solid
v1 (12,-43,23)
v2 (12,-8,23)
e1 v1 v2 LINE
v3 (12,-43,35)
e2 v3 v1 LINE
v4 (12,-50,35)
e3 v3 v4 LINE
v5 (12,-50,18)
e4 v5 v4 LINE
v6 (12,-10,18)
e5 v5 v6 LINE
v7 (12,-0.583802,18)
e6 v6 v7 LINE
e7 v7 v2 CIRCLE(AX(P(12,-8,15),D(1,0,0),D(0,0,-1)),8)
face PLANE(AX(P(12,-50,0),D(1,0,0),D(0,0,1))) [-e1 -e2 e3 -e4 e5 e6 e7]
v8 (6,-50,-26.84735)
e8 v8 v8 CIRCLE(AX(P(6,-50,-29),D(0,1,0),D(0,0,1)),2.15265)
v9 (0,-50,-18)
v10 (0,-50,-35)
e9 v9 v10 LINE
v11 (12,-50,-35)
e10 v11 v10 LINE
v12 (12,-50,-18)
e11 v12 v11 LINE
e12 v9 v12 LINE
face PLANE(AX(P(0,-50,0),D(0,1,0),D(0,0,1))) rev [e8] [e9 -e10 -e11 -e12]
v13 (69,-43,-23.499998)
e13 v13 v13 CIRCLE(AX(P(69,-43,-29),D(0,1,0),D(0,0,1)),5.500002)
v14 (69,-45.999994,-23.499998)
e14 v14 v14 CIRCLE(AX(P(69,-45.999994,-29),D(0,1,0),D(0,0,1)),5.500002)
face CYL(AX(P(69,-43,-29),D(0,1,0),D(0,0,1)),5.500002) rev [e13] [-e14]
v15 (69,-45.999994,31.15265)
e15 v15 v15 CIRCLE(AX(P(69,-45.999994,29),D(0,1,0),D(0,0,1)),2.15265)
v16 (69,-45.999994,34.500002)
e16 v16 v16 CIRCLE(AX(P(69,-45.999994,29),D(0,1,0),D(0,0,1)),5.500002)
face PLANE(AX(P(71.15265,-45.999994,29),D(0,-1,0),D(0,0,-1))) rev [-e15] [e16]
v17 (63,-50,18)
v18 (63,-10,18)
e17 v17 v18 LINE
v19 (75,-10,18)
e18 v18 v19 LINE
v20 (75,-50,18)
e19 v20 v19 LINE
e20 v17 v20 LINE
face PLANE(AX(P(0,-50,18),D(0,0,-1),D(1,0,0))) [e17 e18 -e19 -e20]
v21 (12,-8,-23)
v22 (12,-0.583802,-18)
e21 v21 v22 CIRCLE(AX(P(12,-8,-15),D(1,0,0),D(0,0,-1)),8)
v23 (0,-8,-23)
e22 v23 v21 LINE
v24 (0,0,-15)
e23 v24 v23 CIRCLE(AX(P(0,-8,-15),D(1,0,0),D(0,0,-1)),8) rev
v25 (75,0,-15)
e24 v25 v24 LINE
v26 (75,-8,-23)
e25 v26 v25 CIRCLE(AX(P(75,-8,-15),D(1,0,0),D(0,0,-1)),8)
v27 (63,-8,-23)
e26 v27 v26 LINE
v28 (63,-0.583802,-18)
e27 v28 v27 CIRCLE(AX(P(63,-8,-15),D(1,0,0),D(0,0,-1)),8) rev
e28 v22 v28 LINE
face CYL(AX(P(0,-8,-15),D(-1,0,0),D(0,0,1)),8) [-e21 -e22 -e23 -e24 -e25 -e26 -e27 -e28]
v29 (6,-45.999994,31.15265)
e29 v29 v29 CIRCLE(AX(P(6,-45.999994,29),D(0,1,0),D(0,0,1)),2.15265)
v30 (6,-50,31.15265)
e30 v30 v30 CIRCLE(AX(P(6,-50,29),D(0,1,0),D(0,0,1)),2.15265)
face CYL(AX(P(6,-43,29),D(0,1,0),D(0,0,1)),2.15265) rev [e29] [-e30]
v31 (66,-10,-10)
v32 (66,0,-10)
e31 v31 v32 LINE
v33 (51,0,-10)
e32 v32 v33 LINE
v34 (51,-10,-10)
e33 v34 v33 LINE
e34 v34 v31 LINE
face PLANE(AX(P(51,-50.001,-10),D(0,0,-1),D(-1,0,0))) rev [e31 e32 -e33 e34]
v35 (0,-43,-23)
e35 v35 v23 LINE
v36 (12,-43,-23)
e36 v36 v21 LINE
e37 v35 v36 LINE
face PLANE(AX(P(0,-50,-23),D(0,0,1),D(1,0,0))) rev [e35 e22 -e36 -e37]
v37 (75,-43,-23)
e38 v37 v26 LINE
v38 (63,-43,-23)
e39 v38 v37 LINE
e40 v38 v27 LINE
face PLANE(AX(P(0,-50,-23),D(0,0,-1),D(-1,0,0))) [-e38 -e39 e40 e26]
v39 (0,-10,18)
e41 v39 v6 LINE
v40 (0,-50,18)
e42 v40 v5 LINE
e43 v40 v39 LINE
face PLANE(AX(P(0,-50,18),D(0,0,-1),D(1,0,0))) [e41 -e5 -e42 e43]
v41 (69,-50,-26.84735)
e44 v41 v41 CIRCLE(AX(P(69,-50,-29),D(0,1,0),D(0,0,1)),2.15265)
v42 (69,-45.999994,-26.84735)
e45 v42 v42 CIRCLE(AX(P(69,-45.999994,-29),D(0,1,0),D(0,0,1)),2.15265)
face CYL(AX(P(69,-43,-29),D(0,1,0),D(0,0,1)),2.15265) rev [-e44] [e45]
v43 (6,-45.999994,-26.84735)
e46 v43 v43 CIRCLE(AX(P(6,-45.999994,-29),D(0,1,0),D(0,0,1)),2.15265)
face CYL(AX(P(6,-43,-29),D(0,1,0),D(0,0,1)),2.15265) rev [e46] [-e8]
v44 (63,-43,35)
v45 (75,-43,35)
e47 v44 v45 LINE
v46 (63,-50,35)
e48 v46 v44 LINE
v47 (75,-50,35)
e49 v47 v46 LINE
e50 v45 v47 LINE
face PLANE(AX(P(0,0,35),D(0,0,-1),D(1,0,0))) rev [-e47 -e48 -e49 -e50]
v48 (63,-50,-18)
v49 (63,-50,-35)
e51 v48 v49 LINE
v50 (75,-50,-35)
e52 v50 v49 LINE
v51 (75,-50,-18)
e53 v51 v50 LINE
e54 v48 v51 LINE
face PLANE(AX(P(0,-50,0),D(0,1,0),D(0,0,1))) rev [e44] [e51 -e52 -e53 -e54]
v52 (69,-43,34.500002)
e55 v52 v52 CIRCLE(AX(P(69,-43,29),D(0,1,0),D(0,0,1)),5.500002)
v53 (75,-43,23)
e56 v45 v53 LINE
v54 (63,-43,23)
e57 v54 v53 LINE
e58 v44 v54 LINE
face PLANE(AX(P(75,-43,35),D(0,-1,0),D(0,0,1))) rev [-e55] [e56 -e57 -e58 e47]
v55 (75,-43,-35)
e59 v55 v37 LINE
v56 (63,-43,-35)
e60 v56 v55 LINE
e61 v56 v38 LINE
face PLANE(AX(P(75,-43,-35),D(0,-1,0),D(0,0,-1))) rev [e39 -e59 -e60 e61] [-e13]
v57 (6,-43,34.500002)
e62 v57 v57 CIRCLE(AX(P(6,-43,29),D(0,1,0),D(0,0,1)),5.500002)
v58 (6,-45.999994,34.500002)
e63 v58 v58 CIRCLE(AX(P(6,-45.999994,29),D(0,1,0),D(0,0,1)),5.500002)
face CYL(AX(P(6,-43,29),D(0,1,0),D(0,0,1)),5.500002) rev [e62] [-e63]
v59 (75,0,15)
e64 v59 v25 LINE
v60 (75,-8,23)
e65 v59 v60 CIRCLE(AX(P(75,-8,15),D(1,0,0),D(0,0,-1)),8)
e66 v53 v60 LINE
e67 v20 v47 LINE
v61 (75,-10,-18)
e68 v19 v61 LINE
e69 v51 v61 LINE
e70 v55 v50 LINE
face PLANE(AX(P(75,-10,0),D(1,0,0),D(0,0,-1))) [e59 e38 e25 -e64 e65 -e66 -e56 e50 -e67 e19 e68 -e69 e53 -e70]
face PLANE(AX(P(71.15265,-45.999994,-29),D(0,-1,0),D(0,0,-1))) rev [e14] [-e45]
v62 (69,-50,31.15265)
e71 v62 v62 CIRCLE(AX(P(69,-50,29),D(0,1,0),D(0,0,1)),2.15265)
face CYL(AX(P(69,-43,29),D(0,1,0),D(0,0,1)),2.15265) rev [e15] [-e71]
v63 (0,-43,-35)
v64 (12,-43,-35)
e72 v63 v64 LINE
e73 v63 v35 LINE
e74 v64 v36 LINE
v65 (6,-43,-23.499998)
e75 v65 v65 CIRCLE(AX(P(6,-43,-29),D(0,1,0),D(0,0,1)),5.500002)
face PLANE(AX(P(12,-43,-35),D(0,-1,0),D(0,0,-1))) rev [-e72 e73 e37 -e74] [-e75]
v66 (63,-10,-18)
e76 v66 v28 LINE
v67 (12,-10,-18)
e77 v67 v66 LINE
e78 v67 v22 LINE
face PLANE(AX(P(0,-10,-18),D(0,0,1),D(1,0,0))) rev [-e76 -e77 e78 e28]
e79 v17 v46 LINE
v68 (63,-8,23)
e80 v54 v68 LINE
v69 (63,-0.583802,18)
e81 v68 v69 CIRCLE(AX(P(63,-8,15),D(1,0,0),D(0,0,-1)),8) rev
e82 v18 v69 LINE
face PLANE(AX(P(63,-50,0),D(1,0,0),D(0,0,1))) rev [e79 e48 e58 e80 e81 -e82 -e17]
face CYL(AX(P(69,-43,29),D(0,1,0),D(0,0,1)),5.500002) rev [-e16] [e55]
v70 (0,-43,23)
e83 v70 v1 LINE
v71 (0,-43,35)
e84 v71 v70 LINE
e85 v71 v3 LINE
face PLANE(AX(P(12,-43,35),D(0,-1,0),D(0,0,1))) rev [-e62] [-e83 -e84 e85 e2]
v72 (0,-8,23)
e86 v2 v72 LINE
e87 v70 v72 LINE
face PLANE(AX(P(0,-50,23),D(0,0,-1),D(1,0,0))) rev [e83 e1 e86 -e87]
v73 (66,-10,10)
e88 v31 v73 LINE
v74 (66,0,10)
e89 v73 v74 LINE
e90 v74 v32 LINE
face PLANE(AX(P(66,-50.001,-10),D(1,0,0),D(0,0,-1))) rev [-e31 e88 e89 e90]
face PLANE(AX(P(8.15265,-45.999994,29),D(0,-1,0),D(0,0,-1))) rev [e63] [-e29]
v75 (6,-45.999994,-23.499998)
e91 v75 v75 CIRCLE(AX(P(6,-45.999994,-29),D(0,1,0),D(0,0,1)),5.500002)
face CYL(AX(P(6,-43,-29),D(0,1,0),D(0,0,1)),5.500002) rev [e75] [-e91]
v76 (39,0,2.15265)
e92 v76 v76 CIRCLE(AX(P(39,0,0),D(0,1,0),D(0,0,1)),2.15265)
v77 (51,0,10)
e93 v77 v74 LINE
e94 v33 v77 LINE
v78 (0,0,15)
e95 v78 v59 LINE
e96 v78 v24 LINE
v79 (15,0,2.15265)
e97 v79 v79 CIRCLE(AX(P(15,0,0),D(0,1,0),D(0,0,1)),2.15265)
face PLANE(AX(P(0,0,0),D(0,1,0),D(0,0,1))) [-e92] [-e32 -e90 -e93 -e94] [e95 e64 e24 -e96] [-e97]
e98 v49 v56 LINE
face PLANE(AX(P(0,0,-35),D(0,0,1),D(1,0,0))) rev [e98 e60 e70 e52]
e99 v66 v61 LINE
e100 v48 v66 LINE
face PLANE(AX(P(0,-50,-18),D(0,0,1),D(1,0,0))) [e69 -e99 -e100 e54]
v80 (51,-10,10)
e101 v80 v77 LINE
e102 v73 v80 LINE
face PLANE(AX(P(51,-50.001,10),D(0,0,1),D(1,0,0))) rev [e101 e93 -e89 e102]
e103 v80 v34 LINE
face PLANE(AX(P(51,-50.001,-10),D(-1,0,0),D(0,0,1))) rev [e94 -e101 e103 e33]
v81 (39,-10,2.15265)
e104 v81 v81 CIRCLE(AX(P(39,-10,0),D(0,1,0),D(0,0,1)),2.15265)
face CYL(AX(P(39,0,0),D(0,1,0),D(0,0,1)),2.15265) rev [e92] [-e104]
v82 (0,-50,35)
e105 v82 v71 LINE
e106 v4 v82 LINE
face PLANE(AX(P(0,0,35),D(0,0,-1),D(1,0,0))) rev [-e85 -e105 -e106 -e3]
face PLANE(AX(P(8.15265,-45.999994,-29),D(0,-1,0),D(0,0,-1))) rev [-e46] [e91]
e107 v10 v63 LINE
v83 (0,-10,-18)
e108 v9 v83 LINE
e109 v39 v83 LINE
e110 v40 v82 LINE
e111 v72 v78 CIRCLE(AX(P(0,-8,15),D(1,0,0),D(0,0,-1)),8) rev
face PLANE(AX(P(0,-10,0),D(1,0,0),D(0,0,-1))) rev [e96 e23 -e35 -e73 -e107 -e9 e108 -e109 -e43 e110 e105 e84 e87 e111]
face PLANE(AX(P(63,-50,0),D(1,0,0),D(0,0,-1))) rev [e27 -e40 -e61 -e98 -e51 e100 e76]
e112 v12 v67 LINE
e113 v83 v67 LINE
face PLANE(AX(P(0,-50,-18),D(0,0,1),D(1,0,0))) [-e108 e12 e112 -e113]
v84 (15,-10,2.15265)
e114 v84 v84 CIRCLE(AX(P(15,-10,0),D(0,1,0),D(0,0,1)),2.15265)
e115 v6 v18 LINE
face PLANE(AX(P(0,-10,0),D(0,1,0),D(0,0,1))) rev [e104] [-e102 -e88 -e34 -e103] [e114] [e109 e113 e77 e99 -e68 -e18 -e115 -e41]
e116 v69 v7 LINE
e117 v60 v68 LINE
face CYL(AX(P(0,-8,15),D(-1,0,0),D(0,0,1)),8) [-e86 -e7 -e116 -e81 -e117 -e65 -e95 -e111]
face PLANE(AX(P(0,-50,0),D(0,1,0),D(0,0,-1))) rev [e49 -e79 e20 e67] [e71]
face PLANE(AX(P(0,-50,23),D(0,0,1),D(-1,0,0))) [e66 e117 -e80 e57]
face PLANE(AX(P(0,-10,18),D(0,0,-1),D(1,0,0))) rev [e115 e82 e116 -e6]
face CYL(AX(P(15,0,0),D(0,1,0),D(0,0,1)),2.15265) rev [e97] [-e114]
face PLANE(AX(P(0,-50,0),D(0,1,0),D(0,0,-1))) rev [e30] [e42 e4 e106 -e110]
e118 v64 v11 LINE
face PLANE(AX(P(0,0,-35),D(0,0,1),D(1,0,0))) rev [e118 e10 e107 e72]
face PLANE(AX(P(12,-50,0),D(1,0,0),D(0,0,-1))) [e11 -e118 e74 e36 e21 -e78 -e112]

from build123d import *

# Parameters (mm, degrees)
STRUCTURE_W                                     = 75
STRUCTURE_H                                     = 18
BOSS_CORPS_DEPTH                                = 10
BOSS_PATES_OUTLINE_W                            = 50
BOSS_PATES_OUTLINE_H                            = 5
BOSS_PATES_DEPTH                                = 12
BOSS_PATES_START                                = 63
BOSS_PATES_2_OUTLINE_W                          = 50
BOSS_PATES_2_OUTLINE_H                          = 5
BOSS_PATES_2_DEPTH                              = 12
SKETCH2_W                                       = 12
SKETCH2_H                                       = 7
BOSS_ATTACHES_DEPTH                             = 12
F_6_CLEARANCE_HOLE1_D                           = 4.3053
CBORE_FOR_6_PAN_HEAD_MACHINE_SCREW1_D           = 4.3053
CBORE_FOR_6_PAN_HEAD_MACHINE_SCREW1_CBORE_D     = 11.0000034
CBORE_FOR_6_PAN_HEAD_MACHINE_SCREW1_CBORE_DEPTH = 2.999994
FILLET1_R                                       = 8
CUT_EXTRUDE1_REACH                              = 98.695
SKETCH10_W                                      = 15
SKETCH10_H                                      = 20


# Read off the part's stored shape, not the designer's step: Boss-Pates
with BuildPart() as part:
    # Structure → Boss-Corps (new body)
    with BuildSketch(Plane(origin=(0, 0, 0), x_dir=(1, 0, 0), z_dir=(0, 1, 0))):
        with Locations((37.5, 9)):
            Rectangle(STRUCTURE_W, STRUCTURE_H)
    extrude(amount=-BOSS_CORPS_DEPTH)

    # Boss-Pates outline → Boss-Pates (add)
    with BuildSketch(Plane.YZ):
        with Locations((-25, -20.5)):
            Rectangle(BOSS_PATES_OUTLINE_W, BOSS_PATES_OUTLINE_H)
    extrude(amount=BOSS_PATES_DEPTH)

    # Boss-Pates 2 outline → Boss-Pates 2 (add)
    with BuildSketch(Plane.YZ.offset(BOSS_PATES_START)):
        with Locations((-25, -20.5)):
            Rectangle(BOSS_PATES_2_OUTLINE_W, BOSS_PATES_2_OUTLINE_H)
    extrude(amount=BOSS_PATES_2_DEPTH)

    # Sketch2 → Boss-Attaches (add)
    with BuildSketch(Plane(origin=(0, 0, -23), x_dir=(-1, 0, 0), z_dir=(0, 0, -1))):
        with Locations((-69, -46.5)):
            Rectangle(SKETCH2_W, SKETCH2_H)
        with Locations((-6, -46.5)):
            Rectangle(SKETCH2_W, SKETCH2_H)
    extrude(amount=BOSS_ATTACHES_DEPTH)

    # Mirror4: part across plane


with BuildPart() as part_1:
    add(part.part)
    add(part.part.mirror(Plane(origin=(0, -10, 0), x_dir=(1, 0, 0), z_dir=(0, 0, 1))))

    # #6 Clearance Hole1 (through all)
    with Locations(Plane(origin=(0, 0, 0), x_dir=(1, 0, 0), z_dir=(0, 1, 0))):
        with Locations((15, 0), (39, 0)):
            Hole(F_6_CLEARANCE_HOLE1_D / 2)

    # CBORE for #6 Pan Head Machine Screw1 (through all)
    with Locations(Plane(origin=(0, -43, 0), x_dir=(1, 0, 0), z_dir=(0, 1, 0))):
        with Locations((6, 29), (69, 29), (69, -29), (6, -29)):
            CounterBoreHole(CBORE_FOR_6_PAN_HEAD_MACHINE_SCREW1_D / 2, CBORE_FOR_6_PAN_HEAD_MACHINE_SCREW1_CBORE_D / 2, CBORE_FOR_6_PAN_HEAD_MACHINE_SCREW1_CBORE_DEPTH)

    # Fillet1
    fillet1_edges = [part_1.edges().sort_by_distance(p)[0] for p in [
        (69, 0, -23),
        (6, 0, 23),
    ]]
    fillet(fillet1_edges, radius=FILLET1_R)

    # Sketch10 → Cut-Extrude1 (cut, up to next)
    with BuildSketch(Plane(origin=(0, 0, 0), x_dir=(1, 0, 0), z_dir=(0, 1, 0)), mode=Mode.PRIVATE) as cut_extrude1_sk1:
        with Locations((58.5, 0)):
            Rectangle(SKETCH10_W, SKETCH10_H)
    cut_extrude1_tool1 = extrude(cut_extrude1_sk1.sketch, amount=-CUT_EXTRUDE1_REACH, mode=Mode.PRIVATE) & part_1.part
    add(cut_extrude1_tool1.solids().sort_by_distance((58.5, 0, 0))[0], mode=Mode.SUBTRACT)


solid = part_1.part
